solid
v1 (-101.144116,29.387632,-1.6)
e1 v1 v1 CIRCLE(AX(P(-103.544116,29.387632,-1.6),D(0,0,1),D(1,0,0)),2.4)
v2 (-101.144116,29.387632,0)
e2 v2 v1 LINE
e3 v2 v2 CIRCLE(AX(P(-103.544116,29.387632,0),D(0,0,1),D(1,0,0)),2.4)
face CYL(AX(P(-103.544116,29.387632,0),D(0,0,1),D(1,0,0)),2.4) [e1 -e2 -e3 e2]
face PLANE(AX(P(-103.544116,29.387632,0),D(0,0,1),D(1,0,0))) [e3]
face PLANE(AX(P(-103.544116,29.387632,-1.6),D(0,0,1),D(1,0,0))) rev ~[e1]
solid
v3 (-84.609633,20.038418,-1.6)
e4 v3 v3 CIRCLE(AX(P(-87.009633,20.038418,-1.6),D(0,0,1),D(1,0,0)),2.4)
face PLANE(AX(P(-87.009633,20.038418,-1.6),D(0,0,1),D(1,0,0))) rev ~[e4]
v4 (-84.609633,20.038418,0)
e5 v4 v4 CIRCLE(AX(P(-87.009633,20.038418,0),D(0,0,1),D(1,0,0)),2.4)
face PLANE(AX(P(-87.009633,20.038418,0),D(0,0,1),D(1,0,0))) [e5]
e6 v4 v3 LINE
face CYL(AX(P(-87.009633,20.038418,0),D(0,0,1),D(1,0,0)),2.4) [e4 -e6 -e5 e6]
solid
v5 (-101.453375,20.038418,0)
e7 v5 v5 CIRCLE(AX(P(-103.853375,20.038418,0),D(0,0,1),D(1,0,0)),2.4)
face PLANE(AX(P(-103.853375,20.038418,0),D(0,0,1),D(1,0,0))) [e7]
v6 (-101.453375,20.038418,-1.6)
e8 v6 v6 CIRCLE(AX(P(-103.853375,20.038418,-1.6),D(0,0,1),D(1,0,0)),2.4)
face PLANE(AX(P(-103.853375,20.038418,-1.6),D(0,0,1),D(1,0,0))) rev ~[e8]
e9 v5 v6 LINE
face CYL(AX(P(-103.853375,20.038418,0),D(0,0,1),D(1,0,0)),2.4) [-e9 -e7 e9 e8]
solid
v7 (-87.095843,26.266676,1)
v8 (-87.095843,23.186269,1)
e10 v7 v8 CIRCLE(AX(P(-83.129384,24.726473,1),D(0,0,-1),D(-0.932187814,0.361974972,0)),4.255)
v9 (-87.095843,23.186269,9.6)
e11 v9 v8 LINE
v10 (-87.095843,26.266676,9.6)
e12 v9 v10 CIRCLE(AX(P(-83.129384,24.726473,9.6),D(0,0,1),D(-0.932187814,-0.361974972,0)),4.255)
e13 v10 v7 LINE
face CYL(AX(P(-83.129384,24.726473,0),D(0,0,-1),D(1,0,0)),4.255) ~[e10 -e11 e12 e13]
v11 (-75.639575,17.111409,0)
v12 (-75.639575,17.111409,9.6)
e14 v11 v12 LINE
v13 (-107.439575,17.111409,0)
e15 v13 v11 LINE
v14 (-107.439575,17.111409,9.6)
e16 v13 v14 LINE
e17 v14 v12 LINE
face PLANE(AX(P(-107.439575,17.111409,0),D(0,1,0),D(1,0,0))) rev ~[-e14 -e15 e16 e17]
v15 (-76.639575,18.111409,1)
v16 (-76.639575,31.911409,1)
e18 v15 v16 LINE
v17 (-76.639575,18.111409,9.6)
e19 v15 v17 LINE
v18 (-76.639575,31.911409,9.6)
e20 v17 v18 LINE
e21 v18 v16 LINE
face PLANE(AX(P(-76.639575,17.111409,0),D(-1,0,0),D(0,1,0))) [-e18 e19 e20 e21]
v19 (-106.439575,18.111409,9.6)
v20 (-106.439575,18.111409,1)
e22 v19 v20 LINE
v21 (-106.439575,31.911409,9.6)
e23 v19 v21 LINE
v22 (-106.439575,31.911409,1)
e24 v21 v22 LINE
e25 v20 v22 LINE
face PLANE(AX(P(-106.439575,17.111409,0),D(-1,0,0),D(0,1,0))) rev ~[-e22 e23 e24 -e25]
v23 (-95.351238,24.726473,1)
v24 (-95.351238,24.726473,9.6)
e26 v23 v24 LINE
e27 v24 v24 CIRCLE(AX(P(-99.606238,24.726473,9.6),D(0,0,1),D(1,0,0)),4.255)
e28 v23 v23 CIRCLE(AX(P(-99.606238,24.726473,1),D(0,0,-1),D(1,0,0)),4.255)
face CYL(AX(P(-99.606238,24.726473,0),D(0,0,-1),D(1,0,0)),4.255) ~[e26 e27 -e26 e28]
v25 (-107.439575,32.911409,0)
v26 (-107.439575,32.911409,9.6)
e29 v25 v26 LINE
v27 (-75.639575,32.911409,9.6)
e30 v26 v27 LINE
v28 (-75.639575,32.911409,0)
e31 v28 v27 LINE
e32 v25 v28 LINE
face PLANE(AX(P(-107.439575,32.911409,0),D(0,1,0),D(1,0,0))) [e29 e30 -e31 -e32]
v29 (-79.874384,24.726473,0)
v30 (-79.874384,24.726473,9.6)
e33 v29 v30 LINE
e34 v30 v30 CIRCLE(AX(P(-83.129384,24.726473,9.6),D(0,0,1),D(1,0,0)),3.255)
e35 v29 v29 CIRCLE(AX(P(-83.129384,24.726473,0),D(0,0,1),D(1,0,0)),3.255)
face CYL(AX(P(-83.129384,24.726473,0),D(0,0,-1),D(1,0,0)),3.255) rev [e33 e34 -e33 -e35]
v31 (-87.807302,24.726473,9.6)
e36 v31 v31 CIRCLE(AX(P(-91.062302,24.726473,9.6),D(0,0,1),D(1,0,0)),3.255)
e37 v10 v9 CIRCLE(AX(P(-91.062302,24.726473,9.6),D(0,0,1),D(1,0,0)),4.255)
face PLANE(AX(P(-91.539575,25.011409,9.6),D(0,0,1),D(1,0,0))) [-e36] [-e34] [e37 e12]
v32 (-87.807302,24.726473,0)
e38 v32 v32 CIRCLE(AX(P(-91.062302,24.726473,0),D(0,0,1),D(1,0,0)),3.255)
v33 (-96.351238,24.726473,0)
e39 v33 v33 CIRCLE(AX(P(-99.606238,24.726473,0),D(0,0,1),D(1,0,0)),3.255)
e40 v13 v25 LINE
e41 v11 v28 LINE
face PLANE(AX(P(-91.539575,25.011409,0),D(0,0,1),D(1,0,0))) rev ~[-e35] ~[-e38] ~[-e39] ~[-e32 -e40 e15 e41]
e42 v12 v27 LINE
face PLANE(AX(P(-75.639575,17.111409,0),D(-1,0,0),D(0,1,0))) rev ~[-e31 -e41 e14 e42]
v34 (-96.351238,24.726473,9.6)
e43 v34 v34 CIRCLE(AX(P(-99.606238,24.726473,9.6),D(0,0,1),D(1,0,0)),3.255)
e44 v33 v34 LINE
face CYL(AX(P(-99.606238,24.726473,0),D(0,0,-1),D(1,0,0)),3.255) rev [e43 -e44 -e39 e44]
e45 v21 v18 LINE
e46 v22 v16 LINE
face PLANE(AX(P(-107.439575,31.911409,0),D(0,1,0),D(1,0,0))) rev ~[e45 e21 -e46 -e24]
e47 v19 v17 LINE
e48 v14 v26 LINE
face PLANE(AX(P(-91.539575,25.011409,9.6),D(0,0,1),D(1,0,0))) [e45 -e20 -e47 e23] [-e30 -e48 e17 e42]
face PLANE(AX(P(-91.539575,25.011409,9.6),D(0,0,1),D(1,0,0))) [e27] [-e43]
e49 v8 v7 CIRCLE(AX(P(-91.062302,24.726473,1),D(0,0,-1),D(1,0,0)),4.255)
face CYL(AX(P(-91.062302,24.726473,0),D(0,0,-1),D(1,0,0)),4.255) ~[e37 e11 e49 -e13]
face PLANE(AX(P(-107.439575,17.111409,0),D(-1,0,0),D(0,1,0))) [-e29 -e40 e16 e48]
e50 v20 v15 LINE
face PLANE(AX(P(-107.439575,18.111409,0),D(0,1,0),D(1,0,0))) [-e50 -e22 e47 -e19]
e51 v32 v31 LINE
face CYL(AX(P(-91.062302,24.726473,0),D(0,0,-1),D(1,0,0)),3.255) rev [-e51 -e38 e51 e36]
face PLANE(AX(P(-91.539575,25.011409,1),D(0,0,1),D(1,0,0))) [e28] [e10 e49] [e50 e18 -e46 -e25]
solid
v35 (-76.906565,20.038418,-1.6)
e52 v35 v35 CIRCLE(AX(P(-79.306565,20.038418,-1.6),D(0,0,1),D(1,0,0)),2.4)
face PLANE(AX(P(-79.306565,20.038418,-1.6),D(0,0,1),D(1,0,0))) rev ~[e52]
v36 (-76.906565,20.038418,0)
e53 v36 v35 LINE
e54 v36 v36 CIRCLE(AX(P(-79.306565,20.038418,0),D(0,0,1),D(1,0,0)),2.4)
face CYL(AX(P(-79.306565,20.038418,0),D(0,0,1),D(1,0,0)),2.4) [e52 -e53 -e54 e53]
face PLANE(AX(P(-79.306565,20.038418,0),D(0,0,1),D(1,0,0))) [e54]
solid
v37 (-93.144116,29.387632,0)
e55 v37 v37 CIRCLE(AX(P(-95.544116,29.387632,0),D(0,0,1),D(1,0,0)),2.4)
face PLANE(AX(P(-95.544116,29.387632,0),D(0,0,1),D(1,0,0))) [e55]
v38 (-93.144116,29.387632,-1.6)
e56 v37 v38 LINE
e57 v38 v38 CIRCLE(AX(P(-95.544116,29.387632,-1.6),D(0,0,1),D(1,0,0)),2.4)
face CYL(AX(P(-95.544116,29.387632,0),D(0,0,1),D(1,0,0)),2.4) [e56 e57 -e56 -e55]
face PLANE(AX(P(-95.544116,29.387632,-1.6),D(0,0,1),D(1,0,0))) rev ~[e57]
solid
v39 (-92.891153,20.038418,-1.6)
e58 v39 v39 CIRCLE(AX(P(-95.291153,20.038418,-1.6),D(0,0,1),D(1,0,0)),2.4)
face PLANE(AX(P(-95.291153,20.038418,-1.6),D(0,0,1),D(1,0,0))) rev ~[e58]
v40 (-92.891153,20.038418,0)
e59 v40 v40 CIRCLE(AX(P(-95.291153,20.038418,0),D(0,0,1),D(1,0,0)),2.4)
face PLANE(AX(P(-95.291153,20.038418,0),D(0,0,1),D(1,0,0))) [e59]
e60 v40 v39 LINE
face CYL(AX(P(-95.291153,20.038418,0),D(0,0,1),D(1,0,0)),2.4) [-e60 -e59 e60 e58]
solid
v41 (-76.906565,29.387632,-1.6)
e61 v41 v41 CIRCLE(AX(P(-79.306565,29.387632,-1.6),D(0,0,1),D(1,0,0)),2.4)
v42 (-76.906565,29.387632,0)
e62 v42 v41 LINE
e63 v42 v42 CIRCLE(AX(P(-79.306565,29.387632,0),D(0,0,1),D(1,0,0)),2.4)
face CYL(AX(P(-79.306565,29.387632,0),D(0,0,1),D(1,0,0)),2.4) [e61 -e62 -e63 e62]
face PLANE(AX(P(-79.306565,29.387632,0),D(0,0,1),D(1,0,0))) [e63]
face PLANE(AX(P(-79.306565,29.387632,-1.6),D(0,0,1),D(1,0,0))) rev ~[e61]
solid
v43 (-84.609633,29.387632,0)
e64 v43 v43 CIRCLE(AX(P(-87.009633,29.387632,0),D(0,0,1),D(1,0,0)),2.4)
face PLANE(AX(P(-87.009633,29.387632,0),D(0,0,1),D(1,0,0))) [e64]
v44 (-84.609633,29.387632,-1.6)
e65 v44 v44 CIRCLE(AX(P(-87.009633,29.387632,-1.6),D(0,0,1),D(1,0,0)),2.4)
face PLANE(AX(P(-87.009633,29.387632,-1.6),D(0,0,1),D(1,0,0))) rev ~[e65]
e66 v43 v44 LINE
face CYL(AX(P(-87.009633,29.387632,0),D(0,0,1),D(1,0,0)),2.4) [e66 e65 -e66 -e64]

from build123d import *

# Parameters (mm, degrees)
F0_W     = 31.8
F0_H     = 15.8
F0_R     = 2.4
F0_R_2   = 3.255
F1_DEPTH = 9.6
F2_DEPTH = 1.6
F3_T     = -1


# Not quite as in the source:
# - a feature names something its author has since deleted; it is built from what else it names


with BuildPart() as f1:
    # F0 (on Top) → F1 (new body)
    with BuildSketch(Plane.XY):
        with Locations((-91.5395749569, 25.0114094891)):
            Rectangle(F0_W, F0_H)
        with Locations((-103.8533747765, 20.0384181401)):
            Circle(F0_R, mode=Mode.SUBTRACT)
        with Locations((-95.2911525131, 20.0384181401)):
            Circle(F0_R, mode=Mode.SUBTRACT)
        with Locations((-99.6062383056, 24.726472795)):
            Circle(F0_R_2, mode=Mode.SUBTRACT)
        with Locations((-87.0096325433, 20.0384181401)):
            Circle(F0_R, mode=Mode.SUBTRACT)
        with Locations((-79.3065652251, 20.0384181401)):
            Circle(F0_R, mode=Mode.SUBTRACT)
        with Locations((-91.0623019177, 24.726472795)):
            Circle(F0_R_2, mode=Mode.SUBTRACT)
        with Locations((-83.1293836236, 24.726472795)):
            Circle(F0_R_2, mode=Mode.SUBTRACT)
        with Locations((-103.5441160202, 29.3876323849)):
            Circle(F0_R, mode=Mode.SUBTRACT)
        with Locations((-95.5441160202, 29.3876323849)):
            Circle(F0_R, mode=Mode.SUBTRACT)
        with Locations((-87.0096325433, 29.3876323849)):
            Circle(F0_R, mode=Mode.SUBTRACT)
        with Locations((-79.3065652251, 29.3876323849)):
            Circle(F0_R, mode=Mode.SUBTRACT)
        with Locations((-103.5441160202, 29.3876323849)):
            Circle(F0_R)
        with Locations((-79.3065652251, 29.3876323849)):
            Circle(F0_R)
        with Locations((-87.0096325433, 29.3876323849)):
            Circle(F0_R)
        with Locations((-79.3065652251, 20.0384181401)):
            Circle(F0_R)
        with Locations((-103.8533747765, 20.0384181401)):
            Circle(F0_R)
        with Locations((-95.5441160202, 29.3876323849)):
            Circle(F0_R)
        with Locations((-95.2911525131, 20.0384181401)):
            Circle(F0_R)
        with Locations((-87.0096325433, 20.0384181401)):
            Circle(F0_R)
    extrude(amount=F1_DEPTH)

    # F3
    f3_openings = [f1.faces().sort_by_distance(p)[0] for p in [
        (-91.539575, 32.556321, 9.6),
    ]]
    offset(amount=F3_T, openings=f3_openings)


with BuildPart() as f2:
    # F0 (on Top) → F2 (new body)
    with BuildSketch(Plane.XY):
        with Locations((-103.5441160202, 29.3876323849)):
            Circle(F0_R)
    extrude(amount=-F2_DEPTH)


with BuildPart() as f2b:
    # F0 (on Top) → F2, piece 2 (new body)
    with BuildSketch(Plane.XY):
        with Locations((-87.0096325433, 29.3876323849)):
            Circle(F0_R)
    extrude(amount=-F2_DEPTH)


with BuildPart() as f2c:
    # F0 (on Top) → F2, piece 3 (new body)
    with BuildSketch(Plane.XY):
        with Locations((-95.5441160202, 29.3876323849)):
            Circle(F0_R)
    extrude(amount=-F2_DEPTH)


with BuildPart() as f2d:
    # F0 (on Top) → F2, piece 4 (new body)
    with BuildSketch(Plane.XY):
        with Locations((-79.3065652251, 29.3876323849)):
            Circle(F0_R)
    extrude(amount=-F2_DEPTH)


with BuildPart() as f2e:
    # F0 (on Top) → F2, piece 5 (new body)
    with BuildSketch(Plane.XY):
        with Locations((-87.0096325433, 20.0384181401)):
            Circle(F0_R)
    extrude(amount=-F2_DEPTH)


with BuildPart() as f2f:
    # F0 (on Top) → F2, piece 6 (new body)
    with BuildSketch(Plane.XY):
        with Locations((-79.3065652251, 20.0384181401)):
            Circle(F0_R)
    extrude(amount=-F2_DEPTH)


with BuildPart() as f2g:
    # F0 (on Top) → F2, piece 7 (new body)
    with BuildSketch(Plane.XY):
        with Locations((-95.2911525131, 20.0384181401)):
            Circle(F0_R)
    extrude(amount=-F2_DEPTH)


with BuildPart() as f2h:
    # F0 (on Top) → F2, piece 8 (new body)
    with BuildSketch(Plane.XY):
        with Locations((-103.8533747765, 20.0384181401)):
            Circle(F0_R)
    extrude(amount=-F2_DEPTH)


solid = Compound([f1.part, f2.part, f2b.part, f2c.part, f2d.part, f2e.part, f2f.part, f2g.part, f2h.part])
